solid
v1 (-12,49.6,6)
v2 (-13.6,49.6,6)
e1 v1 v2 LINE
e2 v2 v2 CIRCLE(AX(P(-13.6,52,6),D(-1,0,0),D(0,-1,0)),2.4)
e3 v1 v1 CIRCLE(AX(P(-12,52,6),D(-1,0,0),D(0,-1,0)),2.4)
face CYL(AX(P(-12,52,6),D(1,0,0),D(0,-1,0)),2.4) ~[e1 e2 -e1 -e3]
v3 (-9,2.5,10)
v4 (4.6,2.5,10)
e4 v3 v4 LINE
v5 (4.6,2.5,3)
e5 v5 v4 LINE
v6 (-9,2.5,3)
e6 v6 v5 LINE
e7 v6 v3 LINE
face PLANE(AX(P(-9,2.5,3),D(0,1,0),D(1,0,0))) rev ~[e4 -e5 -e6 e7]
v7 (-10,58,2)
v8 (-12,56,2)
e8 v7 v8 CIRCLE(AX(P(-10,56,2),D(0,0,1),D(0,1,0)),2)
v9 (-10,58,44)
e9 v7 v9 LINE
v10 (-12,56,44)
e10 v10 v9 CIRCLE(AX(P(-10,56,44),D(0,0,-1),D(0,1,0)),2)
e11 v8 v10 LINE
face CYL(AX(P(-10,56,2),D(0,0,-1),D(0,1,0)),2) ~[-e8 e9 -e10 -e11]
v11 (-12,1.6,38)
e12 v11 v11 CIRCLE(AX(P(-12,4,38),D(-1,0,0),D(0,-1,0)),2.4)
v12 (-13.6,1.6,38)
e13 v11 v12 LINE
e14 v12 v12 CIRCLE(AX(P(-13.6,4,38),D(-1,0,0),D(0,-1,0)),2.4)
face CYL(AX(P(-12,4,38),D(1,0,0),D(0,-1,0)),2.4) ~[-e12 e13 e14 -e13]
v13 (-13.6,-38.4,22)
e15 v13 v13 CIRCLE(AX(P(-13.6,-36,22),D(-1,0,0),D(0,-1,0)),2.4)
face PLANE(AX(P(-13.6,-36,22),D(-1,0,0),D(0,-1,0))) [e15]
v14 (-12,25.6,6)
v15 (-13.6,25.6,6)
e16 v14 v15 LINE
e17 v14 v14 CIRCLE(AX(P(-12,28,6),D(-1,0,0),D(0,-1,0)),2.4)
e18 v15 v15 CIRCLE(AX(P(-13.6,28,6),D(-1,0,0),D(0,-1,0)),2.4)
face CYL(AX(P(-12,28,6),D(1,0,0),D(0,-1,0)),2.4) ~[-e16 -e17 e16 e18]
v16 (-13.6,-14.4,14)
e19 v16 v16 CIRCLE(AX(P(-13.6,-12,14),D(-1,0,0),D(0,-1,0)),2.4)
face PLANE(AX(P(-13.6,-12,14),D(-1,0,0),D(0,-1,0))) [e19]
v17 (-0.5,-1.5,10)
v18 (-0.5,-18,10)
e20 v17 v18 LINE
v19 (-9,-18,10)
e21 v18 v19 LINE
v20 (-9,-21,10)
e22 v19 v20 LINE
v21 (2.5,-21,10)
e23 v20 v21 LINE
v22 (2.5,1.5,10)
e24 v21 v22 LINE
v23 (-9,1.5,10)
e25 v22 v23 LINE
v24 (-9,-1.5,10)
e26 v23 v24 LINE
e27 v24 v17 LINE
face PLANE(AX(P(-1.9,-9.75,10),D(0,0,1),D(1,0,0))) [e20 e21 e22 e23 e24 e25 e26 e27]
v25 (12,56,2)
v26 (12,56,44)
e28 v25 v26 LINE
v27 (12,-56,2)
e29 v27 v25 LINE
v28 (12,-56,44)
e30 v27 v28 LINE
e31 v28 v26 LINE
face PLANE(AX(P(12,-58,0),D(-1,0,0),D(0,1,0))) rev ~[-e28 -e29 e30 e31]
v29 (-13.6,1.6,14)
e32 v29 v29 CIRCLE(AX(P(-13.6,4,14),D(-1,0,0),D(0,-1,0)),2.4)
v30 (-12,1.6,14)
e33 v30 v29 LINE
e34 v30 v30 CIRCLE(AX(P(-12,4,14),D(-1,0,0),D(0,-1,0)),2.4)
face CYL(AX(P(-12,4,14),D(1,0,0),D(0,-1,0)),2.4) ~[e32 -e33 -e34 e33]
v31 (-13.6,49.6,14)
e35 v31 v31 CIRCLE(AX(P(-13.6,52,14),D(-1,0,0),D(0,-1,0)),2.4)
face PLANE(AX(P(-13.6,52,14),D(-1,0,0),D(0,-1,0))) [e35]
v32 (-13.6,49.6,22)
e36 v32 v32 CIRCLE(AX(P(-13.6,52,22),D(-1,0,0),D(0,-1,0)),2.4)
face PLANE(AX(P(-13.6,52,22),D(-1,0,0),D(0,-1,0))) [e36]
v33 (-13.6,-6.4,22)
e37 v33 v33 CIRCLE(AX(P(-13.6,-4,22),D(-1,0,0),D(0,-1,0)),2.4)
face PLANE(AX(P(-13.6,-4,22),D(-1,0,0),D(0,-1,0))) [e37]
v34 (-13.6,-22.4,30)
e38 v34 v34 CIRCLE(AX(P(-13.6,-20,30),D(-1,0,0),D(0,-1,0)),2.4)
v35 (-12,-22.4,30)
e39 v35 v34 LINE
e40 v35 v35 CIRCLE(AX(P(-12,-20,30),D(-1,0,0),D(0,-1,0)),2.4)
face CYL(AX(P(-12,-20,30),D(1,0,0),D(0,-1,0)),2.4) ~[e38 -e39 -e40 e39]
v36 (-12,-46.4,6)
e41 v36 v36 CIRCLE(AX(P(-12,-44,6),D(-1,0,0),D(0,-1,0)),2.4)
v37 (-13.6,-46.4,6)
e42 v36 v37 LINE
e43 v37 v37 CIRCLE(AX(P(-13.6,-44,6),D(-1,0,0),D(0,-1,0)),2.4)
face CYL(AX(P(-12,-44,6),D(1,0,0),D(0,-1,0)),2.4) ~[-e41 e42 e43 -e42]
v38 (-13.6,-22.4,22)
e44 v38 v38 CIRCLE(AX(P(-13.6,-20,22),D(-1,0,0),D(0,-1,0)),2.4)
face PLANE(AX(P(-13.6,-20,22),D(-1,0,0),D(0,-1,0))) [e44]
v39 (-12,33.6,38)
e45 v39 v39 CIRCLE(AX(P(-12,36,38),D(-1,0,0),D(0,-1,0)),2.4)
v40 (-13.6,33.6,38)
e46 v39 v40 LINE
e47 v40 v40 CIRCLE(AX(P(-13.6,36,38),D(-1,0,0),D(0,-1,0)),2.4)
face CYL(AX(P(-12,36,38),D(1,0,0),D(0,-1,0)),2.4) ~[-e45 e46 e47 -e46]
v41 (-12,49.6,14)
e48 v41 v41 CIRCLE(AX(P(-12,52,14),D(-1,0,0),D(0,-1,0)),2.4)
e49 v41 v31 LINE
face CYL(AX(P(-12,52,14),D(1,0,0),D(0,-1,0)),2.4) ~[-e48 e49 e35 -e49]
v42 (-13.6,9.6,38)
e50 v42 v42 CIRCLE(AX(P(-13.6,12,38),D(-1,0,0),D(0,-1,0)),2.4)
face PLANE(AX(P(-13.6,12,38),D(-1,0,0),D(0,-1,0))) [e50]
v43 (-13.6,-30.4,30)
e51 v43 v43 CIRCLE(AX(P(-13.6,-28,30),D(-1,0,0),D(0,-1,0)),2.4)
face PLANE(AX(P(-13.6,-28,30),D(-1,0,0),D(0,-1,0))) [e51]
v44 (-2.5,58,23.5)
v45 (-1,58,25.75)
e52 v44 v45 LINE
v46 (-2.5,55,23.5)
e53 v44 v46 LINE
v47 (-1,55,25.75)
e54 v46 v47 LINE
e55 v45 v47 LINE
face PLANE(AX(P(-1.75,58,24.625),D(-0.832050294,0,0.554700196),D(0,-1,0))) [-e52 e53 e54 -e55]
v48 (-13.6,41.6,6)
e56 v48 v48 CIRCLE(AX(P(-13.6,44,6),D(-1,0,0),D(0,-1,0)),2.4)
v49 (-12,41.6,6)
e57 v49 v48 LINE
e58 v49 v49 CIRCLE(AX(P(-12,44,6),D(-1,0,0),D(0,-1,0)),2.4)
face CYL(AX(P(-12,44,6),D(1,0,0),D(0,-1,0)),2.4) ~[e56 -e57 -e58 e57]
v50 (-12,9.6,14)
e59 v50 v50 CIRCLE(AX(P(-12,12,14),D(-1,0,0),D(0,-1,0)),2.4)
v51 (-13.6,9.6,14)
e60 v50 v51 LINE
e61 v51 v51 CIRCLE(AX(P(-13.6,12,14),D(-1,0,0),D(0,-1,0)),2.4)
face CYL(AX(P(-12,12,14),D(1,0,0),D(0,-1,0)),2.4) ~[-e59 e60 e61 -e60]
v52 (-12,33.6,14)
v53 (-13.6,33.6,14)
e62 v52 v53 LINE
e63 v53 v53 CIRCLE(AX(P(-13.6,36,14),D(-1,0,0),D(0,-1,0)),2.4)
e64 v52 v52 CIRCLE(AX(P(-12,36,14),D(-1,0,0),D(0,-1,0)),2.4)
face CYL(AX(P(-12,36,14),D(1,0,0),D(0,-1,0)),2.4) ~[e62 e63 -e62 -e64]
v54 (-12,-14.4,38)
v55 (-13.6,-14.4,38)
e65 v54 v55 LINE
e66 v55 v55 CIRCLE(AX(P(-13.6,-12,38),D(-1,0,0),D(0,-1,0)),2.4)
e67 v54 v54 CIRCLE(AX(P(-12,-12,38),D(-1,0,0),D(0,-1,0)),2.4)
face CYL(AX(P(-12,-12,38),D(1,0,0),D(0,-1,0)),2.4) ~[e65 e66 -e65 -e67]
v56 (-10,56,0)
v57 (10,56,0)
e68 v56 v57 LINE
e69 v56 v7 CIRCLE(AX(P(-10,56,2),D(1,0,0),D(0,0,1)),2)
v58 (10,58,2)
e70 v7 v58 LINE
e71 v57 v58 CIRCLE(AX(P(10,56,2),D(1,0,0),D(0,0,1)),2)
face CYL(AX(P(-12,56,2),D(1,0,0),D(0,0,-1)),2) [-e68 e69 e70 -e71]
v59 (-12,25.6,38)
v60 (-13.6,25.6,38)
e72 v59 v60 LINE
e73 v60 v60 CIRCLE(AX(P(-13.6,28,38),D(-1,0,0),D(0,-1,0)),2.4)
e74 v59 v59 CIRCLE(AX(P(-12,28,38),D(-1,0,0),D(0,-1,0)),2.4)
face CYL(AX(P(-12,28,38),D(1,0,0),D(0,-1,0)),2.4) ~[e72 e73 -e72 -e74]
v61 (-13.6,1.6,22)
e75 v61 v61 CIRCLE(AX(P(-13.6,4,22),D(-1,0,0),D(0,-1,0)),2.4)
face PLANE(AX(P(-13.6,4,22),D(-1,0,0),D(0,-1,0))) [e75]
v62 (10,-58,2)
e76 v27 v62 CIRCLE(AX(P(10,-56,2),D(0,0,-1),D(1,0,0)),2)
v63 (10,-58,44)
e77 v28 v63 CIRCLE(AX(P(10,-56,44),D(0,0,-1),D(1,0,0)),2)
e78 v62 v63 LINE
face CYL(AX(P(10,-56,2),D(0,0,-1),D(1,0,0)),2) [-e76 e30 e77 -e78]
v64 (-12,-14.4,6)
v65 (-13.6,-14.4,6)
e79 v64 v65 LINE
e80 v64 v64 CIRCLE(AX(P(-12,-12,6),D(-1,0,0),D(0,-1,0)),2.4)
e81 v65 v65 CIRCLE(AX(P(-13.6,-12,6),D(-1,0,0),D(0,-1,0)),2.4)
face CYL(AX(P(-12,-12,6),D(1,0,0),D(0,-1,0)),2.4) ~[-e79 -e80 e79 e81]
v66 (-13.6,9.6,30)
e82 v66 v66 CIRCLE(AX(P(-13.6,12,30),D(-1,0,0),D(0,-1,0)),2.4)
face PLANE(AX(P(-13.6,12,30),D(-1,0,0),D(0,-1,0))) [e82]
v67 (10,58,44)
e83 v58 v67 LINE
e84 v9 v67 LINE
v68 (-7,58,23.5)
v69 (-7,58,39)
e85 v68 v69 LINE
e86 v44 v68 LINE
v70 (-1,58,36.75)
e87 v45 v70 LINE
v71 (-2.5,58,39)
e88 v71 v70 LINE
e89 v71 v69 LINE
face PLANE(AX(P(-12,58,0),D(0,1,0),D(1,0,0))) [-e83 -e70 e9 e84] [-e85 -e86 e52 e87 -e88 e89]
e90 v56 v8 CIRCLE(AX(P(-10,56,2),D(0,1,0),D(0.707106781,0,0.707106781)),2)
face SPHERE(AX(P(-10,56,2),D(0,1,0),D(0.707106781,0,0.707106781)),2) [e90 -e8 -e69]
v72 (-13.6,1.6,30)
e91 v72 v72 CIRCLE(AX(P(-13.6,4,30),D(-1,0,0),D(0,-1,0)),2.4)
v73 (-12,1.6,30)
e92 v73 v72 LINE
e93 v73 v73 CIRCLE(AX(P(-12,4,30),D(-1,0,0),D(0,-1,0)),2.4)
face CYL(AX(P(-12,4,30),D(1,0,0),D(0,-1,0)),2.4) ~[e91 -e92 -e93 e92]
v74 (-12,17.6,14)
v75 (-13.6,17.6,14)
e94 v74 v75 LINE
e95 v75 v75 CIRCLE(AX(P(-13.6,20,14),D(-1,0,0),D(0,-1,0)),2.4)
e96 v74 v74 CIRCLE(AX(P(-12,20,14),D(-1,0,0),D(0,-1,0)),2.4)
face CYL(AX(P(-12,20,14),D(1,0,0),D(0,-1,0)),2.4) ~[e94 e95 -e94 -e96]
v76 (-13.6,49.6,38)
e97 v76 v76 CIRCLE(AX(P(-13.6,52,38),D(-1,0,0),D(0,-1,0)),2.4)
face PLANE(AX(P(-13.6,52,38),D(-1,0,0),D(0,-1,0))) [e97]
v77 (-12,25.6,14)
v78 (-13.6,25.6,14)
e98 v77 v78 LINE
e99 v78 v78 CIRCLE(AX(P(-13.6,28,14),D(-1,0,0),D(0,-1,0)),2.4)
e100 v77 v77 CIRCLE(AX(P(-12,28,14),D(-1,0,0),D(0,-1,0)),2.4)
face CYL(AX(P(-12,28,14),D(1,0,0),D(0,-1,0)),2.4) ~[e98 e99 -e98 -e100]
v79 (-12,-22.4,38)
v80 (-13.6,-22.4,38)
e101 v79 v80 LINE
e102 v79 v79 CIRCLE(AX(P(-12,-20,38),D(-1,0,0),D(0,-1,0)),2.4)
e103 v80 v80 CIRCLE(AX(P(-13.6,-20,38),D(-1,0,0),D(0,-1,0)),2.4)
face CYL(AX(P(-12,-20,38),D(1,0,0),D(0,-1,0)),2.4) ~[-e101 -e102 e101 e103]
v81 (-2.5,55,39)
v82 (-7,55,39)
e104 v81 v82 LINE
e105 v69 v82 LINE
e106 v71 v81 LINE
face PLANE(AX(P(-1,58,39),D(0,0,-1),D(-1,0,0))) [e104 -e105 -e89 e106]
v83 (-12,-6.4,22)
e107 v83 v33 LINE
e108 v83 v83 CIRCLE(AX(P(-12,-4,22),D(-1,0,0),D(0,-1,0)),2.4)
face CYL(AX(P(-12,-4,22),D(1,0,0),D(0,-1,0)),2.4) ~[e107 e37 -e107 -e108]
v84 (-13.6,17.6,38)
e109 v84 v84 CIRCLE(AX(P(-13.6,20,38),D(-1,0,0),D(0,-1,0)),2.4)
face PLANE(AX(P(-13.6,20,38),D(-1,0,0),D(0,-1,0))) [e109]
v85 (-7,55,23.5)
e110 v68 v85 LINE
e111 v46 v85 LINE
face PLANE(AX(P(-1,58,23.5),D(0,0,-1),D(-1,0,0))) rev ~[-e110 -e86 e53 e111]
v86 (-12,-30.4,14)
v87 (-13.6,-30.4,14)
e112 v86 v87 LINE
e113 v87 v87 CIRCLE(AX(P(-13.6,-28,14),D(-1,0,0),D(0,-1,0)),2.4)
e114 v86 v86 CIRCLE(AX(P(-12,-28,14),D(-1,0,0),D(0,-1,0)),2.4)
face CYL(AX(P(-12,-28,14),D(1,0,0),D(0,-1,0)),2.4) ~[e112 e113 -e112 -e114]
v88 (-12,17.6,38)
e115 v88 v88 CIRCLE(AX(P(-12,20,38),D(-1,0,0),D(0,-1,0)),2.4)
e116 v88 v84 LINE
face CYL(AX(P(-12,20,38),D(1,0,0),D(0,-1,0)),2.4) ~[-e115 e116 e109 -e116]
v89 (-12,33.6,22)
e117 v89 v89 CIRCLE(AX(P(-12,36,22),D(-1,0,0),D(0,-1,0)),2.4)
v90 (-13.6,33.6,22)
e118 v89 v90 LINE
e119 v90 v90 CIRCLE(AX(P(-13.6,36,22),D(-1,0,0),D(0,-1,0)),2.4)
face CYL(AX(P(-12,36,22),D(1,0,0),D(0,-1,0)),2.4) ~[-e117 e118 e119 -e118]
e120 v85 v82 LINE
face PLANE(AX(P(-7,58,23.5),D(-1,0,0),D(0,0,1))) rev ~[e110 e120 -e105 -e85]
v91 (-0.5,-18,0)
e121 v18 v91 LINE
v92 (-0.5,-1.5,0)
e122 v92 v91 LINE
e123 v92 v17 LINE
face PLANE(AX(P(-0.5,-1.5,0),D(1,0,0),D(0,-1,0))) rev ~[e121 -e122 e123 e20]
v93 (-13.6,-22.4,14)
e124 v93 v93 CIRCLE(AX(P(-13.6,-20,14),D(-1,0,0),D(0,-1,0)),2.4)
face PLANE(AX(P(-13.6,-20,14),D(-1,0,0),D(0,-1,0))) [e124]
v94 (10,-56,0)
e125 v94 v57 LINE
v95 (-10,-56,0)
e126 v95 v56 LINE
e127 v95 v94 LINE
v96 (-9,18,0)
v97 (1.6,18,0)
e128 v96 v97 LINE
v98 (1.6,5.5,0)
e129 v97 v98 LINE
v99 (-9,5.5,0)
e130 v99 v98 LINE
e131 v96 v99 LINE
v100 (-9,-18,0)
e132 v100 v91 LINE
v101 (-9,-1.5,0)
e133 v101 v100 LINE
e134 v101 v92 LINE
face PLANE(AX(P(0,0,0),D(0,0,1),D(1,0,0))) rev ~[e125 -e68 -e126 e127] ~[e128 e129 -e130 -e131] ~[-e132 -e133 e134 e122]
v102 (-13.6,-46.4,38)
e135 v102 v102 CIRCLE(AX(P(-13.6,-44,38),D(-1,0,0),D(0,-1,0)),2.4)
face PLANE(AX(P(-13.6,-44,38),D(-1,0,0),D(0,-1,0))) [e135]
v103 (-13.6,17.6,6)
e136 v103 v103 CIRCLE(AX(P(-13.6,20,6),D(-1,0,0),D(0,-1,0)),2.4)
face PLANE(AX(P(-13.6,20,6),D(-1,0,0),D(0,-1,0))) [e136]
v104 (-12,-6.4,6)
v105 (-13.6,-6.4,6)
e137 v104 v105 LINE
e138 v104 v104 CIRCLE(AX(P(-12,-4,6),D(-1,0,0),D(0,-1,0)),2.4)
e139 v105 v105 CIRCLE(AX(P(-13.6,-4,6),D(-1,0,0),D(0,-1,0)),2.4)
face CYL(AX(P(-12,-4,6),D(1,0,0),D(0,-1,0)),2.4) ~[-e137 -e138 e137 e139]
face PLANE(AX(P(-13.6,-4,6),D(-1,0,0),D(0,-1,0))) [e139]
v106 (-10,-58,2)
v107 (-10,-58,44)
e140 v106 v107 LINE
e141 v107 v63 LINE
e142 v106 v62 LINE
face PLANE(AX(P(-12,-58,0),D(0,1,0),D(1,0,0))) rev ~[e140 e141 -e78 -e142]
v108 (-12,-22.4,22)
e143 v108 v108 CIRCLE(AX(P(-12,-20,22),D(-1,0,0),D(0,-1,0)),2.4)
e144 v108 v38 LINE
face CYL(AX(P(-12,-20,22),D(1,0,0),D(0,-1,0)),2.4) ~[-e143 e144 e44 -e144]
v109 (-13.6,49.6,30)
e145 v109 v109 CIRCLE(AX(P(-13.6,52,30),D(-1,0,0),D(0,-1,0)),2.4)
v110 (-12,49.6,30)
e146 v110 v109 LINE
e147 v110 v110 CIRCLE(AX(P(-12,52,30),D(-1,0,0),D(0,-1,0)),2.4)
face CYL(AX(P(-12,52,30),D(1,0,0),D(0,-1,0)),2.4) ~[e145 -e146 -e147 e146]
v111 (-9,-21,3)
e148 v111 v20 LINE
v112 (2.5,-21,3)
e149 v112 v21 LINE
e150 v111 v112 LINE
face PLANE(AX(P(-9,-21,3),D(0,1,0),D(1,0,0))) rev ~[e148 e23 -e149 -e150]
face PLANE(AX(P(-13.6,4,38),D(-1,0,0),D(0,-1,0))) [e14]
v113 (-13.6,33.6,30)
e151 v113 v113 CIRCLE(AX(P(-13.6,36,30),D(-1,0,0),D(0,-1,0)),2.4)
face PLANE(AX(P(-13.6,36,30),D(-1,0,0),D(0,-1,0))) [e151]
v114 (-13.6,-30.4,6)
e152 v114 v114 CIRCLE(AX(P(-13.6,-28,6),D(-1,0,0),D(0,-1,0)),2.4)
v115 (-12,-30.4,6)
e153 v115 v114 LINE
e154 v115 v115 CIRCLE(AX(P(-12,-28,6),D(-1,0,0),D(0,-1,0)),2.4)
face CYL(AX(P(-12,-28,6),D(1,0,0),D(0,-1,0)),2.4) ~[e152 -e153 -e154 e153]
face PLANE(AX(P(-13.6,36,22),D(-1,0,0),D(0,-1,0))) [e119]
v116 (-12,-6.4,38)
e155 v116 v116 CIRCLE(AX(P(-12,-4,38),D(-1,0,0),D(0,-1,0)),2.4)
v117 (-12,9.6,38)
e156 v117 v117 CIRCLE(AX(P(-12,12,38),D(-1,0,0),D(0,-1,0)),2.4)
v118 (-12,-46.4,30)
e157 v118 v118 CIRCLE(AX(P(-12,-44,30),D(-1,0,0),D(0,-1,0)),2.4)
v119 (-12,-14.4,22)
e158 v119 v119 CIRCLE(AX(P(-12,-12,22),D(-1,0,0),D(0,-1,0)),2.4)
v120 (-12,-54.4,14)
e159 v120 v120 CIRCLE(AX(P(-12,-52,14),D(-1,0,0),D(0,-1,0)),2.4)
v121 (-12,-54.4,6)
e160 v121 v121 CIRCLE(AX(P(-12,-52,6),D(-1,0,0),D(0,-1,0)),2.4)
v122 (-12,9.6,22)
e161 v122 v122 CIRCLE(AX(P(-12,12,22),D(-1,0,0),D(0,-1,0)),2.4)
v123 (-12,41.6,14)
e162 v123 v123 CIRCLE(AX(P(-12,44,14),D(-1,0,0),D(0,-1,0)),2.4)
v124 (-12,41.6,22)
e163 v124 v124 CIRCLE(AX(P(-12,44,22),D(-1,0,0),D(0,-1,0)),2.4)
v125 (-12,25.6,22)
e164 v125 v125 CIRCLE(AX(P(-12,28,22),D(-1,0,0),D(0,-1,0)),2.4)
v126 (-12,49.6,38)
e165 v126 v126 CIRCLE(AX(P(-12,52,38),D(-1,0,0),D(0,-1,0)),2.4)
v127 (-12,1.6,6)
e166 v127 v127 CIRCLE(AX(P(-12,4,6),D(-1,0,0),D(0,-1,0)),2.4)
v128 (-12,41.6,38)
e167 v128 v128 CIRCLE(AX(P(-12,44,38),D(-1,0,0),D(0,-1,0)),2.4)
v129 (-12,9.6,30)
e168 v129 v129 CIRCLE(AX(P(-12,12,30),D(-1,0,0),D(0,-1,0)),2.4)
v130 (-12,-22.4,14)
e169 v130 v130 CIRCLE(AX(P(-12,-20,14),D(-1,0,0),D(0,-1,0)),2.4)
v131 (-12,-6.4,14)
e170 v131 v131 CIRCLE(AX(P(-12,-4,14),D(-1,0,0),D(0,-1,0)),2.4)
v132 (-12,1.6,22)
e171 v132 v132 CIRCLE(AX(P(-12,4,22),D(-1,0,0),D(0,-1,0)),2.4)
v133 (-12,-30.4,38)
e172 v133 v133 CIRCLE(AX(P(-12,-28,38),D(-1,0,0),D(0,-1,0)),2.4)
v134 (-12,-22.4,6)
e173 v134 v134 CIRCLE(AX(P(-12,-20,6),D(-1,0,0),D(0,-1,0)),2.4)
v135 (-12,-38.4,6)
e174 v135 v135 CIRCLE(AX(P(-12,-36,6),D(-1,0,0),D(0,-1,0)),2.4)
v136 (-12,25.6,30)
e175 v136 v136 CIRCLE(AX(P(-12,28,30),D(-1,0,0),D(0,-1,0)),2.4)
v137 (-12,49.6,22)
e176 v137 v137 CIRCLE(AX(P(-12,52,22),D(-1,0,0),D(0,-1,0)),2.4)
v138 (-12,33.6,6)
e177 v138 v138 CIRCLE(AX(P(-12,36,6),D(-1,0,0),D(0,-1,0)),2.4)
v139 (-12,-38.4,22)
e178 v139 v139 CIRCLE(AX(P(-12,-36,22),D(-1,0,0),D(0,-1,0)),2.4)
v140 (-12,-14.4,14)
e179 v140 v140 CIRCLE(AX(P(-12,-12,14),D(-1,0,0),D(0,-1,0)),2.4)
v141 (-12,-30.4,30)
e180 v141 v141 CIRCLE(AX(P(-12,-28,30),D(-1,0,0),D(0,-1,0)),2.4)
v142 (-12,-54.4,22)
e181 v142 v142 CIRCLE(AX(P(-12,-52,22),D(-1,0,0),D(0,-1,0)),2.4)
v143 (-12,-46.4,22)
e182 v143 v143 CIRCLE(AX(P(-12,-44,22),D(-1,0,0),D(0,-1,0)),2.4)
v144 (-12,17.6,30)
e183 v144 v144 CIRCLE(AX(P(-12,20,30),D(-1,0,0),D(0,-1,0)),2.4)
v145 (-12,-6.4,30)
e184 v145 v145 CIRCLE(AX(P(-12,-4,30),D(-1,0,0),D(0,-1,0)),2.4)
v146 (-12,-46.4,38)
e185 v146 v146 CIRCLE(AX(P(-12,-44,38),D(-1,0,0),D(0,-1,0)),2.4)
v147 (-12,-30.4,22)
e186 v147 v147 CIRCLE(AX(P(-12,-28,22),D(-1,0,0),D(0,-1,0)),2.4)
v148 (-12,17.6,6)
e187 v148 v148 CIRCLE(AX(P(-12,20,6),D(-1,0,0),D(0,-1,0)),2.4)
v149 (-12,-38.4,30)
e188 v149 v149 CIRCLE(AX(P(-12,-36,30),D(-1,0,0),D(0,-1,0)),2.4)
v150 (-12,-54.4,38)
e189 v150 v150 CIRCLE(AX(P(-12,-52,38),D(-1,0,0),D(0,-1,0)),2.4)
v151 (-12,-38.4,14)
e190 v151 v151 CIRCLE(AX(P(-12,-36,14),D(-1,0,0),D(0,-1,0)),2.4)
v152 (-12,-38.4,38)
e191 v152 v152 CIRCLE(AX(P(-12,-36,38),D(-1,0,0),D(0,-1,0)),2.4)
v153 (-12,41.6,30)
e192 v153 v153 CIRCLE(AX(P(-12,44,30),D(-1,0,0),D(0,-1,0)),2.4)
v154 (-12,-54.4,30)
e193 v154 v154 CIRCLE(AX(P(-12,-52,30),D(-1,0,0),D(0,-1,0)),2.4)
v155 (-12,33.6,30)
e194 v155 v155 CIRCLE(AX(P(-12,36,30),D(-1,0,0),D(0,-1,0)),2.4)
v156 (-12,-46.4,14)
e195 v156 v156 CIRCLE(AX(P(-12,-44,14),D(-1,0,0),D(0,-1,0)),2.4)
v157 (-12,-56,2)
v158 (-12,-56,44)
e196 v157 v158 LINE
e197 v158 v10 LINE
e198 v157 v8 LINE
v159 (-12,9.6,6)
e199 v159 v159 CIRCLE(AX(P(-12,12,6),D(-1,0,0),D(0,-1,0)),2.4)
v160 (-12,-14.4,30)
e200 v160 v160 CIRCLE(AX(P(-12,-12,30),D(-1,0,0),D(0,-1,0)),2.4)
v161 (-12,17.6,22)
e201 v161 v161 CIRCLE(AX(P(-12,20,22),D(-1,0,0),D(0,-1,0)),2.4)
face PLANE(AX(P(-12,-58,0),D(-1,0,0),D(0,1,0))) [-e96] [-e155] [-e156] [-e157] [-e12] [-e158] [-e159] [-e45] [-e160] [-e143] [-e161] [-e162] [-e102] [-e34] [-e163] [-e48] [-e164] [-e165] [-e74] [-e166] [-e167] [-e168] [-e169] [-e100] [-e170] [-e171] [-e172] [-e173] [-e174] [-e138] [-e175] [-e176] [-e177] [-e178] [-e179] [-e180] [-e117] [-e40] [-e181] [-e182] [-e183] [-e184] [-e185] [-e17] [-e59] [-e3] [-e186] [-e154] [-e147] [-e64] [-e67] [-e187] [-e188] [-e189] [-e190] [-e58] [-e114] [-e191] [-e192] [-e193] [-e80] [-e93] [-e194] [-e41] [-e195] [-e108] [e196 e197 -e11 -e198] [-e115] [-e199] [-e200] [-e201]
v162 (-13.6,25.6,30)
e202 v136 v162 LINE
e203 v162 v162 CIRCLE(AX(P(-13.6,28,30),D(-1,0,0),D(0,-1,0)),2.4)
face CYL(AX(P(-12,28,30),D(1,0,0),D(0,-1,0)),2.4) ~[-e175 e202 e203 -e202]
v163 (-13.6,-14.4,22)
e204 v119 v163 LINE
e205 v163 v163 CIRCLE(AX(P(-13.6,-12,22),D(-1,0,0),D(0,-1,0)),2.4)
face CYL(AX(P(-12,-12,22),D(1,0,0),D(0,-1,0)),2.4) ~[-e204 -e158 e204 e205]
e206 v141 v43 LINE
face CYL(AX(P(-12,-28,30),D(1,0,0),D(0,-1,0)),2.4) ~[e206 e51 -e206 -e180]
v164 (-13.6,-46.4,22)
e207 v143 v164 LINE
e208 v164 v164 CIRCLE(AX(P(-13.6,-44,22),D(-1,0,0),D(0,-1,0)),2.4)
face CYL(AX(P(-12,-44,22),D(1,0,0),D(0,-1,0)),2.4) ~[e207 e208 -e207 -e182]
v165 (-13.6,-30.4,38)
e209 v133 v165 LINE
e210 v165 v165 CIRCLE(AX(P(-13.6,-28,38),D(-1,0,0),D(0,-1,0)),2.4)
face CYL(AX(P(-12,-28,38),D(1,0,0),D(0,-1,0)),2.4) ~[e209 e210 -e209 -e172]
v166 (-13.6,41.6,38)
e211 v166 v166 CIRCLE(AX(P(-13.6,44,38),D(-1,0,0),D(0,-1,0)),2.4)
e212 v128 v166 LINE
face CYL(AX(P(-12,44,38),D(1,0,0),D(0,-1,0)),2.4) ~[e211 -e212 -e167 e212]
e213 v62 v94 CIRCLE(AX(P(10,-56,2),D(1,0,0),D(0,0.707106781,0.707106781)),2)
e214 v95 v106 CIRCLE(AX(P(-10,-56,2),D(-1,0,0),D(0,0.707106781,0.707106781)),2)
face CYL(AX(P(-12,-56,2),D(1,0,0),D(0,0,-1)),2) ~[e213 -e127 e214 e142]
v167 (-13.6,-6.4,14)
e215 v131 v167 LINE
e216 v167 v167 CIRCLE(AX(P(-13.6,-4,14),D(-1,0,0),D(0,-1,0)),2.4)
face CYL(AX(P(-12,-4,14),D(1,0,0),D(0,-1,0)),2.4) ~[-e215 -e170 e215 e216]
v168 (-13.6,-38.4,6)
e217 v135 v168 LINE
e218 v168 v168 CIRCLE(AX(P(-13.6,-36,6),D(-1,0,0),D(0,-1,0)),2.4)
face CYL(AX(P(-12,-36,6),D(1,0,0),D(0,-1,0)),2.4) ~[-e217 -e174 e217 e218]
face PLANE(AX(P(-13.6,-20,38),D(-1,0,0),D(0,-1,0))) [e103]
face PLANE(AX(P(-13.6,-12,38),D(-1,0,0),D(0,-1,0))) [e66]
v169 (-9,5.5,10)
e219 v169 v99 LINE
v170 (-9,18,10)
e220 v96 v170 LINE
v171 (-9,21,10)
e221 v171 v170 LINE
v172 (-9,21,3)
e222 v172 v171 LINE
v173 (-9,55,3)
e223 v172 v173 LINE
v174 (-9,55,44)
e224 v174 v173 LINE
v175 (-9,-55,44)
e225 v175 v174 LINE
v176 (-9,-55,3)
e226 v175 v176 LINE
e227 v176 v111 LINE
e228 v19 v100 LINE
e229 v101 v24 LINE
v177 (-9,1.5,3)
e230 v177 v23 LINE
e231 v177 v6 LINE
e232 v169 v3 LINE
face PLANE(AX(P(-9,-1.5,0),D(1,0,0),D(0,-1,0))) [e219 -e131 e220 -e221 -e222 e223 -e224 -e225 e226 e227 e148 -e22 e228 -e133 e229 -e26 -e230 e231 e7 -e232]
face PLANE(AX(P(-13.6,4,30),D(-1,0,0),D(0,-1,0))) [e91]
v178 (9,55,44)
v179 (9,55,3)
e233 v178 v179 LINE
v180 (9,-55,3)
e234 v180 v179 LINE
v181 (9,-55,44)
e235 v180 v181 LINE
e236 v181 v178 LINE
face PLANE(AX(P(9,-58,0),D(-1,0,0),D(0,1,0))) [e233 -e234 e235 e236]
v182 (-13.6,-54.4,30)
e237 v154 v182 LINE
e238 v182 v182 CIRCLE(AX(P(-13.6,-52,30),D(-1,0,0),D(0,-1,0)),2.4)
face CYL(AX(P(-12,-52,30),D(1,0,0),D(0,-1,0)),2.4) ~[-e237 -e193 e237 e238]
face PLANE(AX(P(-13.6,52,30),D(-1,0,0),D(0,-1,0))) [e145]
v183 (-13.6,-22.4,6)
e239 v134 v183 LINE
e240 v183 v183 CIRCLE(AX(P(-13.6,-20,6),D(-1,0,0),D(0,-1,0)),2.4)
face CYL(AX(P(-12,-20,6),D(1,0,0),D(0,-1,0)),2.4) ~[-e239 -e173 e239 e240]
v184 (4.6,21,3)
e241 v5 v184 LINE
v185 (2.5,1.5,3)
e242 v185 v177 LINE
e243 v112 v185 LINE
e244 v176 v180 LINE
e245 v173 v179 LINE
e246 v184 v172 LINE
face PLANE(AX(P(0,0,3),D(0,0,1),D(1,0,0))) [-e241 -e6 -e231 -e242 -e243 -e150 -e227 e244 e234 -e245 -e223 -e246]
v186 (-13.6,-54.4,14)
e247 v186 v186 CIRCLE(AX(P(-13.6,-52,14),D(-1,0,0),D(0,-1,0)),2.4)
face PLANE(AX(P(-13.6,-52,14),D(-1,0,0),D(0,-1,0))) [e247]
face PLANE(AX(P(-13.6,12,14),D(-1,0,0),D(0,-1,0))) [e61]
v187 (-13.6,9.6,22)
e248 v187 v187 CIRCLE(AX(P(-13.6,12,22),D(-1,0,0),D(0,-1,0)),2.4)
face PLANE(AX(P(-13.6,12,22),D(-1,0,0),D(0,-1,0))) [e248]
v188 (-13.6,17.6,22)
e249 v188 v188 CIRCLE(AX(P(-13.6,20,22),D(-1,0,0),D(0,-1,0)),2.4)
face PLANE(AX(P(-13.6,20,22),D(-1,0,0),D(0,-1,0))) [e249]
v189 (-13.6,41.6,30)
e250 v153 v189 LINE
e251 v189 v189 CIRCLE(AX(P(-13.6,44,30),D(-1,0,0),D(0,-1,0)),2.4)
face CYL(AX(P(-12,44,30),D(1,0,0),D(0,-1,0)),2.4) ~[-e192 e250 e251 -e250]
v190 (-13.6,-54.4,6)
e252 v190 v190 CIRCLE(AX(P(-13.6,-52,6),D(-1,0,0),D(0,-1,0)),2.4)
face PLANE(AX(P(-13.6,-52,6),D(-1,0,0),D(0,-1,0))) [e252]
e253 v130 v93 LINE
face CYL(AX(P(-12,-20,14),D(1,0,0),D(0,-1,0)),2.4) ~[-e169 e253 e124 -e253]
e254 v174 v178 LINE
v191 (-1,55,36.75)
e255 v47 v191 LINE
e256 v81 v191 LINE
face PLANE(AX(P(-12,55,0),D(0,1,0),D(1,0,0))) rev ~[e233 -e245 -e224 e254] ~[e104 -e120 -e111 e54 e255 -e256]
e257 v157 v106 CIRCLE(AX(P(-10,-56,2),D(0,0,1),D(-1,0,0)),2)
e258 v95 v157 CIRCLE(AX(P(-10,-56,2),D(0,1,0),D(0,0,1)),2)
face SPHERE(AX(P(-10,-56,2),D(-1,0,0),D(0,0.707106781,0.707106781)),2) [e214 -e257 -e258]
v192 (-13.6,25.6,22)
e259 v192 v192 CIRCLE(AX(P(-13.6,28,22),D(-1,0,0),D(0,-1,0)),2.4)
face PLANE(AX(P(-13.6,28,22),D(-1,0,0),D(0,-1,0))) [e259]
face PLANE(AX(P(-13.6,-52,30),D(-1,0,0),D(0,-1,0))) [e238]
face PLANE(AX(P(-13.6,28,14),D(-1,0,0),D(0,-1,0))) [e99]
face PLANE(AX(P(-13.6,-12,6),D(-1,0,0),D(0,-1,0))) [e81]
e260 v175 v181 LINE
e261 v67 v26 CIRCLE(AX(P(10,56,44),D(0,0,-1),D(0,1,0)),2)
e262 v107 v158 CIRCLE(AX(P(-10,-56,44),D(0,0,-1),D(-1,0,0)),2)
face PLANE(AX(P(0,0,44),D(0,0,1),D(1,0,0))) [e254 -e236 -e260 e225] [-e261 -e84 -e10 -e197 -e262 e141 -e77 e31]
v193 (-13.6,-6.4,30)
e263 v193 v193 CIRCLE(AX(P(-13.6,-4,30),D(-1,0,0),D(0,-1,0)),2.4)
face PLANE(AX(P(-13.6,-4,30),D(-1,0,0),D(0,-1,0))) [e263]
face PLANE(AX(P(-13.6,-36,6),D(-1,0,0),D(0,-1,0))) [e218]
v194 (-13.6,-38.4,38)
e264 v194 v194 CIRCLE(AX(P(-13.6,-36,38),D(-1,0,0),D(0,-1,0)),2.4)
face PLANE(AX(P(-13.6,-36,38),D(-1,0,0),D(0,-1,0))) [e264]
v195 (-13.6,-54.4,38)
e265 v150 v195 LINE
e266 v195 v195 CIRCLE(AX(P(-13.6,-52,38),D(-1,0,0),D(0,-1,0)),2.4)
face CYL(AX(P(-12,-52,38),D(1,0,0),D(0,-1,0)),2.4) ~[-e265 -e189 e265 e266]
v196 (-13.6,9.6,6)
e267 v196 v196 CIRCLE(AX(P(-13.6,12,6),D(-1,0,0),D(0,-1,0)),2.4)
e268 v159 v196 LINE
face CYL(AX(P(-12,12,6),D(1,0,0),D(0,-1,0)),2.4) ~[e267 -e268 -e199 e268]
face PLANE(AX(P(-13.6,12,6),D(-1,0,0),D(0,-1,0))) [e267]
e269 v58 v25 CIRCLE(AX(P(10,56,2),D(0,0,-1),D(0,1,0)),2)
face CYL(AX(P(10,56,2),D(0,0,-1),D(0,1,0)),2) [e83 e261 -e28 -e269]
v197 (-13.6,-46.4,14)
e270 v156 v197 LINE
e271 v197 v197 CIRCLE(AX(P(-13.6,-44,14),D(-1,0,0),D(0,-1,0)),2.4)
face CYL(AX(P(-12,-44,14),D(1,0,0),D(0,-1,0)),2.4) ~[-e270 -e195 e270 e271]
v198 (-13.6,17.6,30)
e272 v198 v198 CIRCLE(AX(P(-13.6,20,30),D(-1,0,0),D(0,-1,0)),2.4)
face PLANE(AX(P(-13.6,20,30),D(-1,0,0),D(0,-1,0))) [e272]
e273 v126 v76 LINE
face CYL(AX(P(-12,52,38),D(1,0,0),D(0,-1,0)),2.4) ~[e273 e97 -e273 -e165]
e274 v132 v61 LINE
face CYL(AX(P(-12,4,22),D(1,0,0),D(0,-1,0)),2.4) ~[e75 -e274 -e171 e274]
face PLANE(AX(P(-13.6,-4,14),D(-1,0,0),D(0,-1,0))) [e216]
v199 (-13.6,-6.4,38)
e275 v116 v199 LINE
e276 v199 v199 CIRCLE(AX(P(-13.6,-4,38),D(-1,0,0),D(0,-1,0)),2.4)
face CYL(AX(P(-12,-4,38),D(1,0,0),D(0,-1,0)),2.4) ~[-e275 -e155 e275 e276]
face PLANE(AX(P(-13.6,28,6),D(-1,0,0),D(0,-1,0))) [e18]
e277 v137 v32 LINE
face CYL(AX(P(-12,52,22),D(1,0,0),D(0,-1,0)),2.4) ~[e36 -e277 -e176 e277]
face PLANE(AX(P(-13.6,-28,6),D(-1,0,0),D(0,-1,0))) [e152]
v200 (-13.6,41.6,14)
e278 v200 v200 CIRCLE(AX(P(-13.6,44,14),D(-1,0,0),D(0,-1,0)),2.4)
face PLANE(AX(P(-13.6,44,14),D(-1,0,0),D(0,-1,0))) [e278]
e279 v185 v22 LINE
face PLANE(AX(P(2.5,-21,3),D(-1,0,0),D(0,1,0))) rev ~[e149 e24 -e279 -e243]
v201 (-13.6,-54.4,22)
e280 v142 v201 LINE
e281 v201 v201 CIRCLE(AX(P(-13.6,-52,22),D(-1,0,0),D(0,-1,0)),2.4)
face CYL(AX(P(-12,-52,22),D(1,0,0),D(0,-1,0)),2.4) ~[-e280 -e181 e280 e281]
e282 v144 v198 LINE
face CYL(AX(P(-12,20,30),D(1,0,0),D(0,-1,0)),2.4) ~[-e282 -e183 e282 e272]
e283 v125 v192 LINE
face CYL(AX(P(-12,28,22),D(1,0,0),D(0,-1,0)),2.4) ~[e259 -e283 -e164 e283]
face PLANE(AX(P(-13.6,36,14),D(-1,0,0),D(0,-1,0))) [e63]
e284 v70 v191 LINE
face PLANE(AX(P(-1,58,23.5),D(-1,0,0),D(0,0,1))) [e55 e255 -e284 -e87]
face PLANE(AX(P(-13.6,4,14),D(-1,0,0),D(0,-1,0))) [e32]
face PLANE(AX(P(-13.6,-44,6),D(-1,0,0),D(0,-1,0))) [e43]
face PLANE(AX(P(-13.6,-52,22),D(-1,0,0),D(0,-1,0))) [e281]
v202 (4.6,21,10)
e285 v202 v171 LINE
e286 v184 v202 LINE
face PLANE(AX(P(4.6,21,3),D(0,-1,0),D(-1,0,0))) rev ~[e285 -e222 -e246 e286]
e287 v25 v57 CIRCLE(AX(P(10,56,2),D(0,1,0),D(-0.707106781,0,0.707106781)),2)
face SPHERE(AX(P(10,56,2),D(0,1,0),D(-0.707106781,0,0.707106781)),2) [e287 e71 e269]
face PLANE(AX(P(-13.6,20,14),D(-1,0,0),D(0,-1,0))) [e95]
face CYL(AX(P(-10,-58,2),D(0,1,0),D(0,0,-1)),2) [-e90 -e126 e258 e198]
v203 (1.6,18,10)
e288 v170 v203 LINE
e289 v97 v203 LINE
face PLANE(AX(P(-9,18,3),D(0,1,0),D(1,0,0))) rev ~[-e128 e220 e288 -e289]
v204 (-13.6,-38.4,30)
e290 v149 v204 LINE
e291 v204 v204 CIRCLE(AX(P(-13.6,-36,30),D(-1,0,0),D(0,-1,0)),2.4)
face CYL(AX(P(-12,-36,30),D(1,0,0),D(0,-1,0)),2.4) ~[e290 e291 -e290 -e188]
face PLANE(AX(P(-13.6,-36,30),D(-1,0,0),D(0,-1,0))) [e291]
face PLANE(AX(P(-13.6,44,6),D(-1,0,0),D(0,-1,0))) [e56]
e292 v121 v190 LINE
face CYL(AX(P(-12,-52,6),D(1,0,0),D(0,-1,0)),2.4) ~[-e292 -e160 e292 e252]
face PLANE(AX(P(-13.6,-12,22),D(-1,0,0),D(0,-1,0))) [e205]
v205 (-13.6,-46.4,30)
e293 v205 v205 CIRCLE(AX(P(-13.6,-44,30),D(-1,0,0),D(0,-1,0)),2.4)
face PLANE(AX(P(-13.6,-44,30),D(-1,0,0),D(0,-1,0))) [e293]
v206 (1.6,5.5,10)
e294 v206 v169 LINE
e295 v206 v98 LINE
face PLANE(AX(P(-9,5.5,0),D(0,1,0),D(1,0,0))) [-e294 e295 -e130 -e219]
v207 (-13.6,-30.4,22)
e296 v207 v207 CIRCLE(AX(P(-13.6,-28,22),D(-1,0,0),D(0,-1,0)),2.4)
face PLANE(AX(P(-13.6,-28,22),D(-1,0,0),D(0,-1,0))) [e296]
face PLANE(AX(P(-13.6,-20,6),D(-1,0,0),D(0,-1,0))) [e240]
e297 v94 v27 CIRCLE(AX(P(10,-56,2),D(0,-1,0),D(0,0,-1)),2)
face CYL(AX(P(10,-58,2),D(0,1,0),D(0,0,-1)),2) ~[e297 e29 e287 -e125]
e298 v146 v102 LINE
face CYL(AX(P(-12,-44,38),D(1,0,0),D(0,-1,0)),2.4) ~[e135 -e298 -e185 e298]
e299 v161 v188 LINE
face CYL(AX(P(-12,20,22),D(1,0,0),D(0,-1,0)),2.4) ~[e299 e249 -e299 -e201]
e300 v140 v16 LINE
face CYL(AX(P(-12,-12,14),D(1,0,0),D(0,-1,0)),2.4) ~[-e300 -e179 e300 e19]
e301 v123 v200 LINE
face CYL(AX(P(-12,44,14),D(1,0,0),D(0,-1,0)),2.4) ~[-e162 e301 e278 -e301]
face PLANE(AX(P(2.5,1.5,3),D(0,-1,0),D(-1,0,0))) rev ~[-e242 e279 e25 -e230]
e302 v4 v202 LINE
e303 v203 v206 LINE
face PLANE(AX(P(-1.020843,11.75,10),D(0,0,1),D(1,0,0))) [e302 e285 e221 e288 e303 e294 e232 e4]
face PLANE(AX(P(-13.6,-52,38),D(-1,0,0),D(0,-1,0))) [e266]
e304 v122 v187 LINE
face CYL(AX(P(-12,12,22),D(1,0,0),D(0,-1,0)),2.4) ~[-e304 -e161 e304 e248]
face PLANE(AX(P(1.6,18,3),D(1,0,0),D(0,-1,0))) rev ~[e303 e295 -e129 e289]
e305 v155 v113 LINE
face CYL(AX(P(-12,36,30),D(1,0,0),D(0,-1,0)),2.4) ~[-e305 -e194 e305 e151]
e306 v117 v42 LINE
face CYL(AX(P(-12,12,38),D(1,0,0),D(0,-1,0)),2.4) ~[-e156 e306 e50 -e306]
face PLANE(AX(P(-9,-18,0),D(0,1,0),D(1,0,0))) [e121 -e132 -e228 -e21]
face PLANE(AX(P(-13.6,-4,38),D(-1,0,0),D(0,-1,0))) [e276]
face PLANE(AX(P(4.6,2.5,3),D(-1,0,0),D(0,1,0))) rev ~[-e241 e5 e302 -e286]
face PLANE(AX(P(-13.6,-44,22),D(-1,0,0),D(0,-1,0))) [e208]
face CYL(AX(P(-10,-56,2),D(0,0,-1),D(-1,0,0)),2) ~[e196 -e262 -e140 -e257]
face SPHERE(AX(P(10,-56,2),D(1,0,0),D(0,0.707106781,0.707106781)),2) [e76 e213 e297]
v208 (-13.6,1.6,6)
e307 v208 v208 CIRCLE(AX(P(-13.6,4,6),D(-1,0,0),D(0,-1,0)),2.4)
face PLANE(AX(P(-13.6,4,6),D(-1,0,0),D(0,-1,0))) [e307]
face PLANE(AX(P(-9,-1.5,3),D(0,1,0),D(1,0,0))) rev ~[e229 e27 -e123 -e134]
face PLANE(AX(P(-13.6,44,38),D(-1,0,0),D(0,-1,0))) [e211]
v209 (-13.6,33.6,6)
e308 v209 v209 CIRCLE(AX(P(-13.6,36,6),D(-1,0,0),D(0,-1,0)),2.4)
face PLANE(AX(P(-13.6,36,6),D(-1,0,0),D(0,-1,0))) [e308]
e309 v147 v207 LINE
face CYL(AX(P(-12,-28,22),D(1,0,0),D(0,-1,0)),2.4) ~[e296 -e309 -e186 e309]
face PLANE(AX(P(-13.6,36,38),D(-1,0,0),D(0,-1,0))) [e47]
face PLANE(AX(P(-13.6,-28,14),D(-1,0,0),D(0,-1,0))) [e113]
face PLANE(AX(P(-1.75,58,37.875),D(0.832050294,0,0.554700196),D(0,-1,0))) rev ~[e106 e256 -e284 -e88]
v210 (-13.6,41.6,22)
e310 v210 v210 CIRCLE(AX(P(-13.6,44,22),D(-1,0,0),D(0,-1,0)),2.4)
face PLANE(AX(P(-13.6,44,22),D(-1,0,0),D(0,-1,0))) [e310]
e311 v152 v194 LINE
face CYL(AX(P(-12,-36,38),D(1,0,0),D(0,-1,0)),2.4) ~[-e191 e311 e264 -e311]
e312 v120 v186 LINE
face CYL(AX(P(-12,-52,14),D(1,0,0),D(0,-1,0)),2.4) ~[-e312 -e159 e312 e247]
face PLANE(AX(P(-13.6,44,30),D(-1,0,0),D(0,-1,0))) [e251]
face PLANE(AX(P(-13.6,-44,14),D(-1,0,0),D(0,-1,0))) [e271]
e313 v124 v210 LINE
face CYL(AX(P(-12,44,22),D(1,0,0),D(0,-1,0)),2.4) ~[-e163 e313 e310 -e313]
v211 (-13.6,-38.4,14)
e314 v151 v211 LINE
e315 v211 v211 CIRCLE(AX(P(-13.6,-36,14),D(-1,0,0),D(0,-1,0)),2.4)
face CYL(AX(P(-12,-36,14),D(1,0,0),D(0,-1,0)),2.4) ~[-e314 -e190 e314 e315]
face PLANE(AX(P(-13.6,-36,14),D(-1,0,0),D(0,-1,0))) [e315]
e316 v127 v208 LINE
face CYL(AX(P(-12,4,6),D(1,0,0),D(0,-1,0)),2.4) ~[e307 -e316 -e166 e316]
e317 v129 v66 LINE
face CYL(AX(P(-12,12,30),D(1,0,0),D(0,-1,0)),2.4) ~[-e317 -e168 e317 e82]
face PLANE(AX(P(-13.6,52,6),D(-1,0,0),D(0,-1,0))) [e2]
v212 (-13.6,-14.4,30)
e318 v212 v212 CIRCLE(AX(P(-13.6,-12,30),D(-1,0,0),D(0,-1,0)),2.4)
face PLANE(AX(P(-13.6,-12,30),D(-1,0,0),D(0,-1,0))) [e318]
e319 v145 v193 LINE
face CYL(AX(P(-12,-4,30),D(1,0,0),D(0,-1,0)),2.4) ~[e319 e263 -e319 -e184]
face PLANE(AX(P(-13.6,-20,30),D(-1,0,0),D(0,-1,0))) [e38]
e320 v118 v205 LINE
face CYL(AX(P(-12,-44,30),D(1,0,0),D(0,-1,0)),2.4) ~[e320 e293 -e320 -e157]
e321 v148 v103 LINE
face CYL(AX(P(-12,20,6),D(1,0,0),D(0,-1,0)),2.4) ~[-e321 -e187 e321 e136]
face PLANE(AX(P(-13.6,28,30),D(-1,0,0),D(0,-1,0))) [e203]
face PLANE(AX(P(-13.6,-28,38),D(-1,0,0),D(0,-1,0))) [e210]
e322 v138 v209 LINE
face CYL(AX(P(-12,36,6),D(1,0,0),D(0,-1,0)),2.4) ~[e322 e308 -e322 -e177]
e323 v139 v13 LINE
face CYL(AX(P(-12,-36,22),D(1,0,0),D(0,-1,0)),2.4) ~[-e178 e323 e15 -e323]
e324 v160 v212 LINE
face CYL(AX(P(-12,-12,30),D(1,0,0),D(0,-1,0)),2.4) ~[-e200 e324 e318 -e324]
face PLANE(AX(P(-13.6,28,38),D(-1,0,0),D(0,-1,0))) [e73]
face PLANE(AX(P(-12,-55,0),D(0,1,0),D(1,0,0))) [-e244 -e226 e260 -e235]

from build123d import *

# Parameters (mm, degrees)
F0_W          = 24
F0_H          = 116
F1_DEPTH      = 44
F2_T          = -3
F3_W          = 8.5
F3_H          = 16.5
F3_W_2        = 10.6
F3_H_2        = 12.5
F4_DEPTH      = 25
F5_W          = 6
F5_H          = 15.5
F6_DEPTH      = 25
F7_SIZE2      = 2.25
F7_SIZE       = 1.5
F9_DEPTH      = 7
F10_R         = 2.4
F11_DEPTH     = 1.6
F12_R         = 2
F13_T1_DEPTH  = 47
F13_S5_W      = 2
F13_S5_H      = 2
F13_T6_DEPTH  = 2
F13_S11_W     = 2
F13_S11_H     = 2
F13_T12_DEPTH = 2
F13_S17_W     = 2
F13_S17_H     = 2
F13_T18_DEPTH = 2
F13_S23_W     = 2
F13_S23_H     = 2
F13_T24_DEPTH = 2


# Not quite as in the source:
# - a fillet or chamfer that OpenCascade refuses, or shapes differently, is made with other operations: its cross-section is extruded or revolved along the edge and cut away or added


with BuildPart() as f1:
    # F0 (on Top) → F1 (new body)
    with BuildSketch(Plane.XY):
        Rectangle(F0_W, F0_H)
    extrude(amount=F1_DEPTH)

    # F2
    f2_openings = [f1.faces().sort_by_distance(p)[0] for p in [
        (0, 0, 44),
    ]]
    offset(amount=F2_T, openings=f2_openings)

    # F3 (on face) → F4 (cut)
    with BuildSketch(Plane(origin=(0, 0, 0), x_dir=(1, 0, 0), z_dir=(0, 0, -1))):
        with Locations((-4.75, 9.75)):
            Rectangle(F3_W, F3_H)
        with Locations((-3.7, -11.75)):
            Rectangle(F3_W_2, F3_H_2)
    extrude(amount=-F4_DEPTH, mode=Mode.SUBTRACT)

    # F5 (on face) → F6 (cut)
    with BuildSketch(Plane(origin=(0, 58, 0), x_dir=(-1, 0, 0), z_dir=(0, 1, 0))):
        with Locations((4, 31.25)):
            Rectangle(F5_W, F5_H)
    extrude(amount=-F6_DEPTH, mode=Mode.SUBTRACT)

    # F7
    f7_edges = [f1.edges().sort_by_distance(p)[0] for p in [
        (-1, 56.5, 23.5),
        (-1, 56.5, 39),
    ]]
    chamfer(f7_edges, length=F7_SIZE, length2=F7_SIZE2)

    # F8 (on face) → F9 (join)
    with BuildSketch(Plane.XY.offset(3)):
        Polygon((4.6, 21), (-9, 21), (-9, 18), (1.6, 18), (1.6, 5.5), (-9, 5.5), (-9, 2.5), (4.6, 2.5), align=None)
        Polygon((-9, -18), (-9, -21), (2.5, -21), (2.5, 1.5), (-9, 1.5), (-9, -1.5), (-0.5, -1.5), (-0.5, -18), align=None)
    extrude(amount=F9_DEPTH)

    # F10 (on face) → F11 (join)
    with BuildSketch(Plane(origin=(-12, 0, 0), x_dir=(0, -1, 0), z_dir=(-1, 0, 0))):
        with Locations((-52, 6)):
            Circle(F10_R)
        with Locations((-52, 14)):
            Circle(F10_R)
        with Locations((-52, 22)):
            Circle(F10_R)
        with Locations((-52, 30)):
            Circle(F10_R)
        with Locations((-52, 38)):
            Circle(F10_R)
        with Locations((-44, 6)):
            Circle(F10_R)
        with Locations((-44, 14)):
            Circle(F10_R)
        with Locations((-44, 22)):
            Circle(F10_R)
        with Locations((-44, 30)):
            Circle(F10_R)
        with Locations((-44, 38)):
            Circle(F10_R)
        with Locations((-36, 6)):
            Circle(F10_R)
        with Locations((-36, 14)):
            Circle(F10_R)
        with Locations((-36, 22)):
            Circle(F10_R)
        with Locations((-36, 30)):
            Circle(F10_R)
        with Locations((-36, 38)):
            Circle(F10_R)
        with Locations((-28, 6)):
            Circle(F10_R)
        with Locations((-28, 14)):
            Circle(F10_R)
        with Locations((-28, 22)):
            Circle(F10_R)
        with Locations((-28, 30)):
            Circle(F10_R)
        with Locations((-28, 38)):
            Circle(F10_R)
        with Locations((-20, 6)):
            Circle(F10_R)
        with Locations((-20, 14)):
            Circle(F10_R)
        with Locations((-20, 22)):
            Circle(F10_R)
        with Locations((-20, 30)):
            Circle(F10_R)
        with Locations((-20, 38)):
            Circle(F10_R)
        with Locations((-12, 6)):
            Circle(F10_R)
        with Locations((-12, 14)):
            Circle(F10_R)
        with Locations((-12, 22)):
            Circle(F10_R)
        with Locations((-12, 30)):
            Circle(F10_R)
        with Locations((-12, 38)):
            Circle(F10_R)
        with Locations((-4, 6)):
            Circle(F10_R)
        with Locations((-4, 14)):
            Circle(F10_R)
        with Locations((-4, 22)):
            Circle(F10_R)
        with Locations((-4, 30)):
            Circle(F10_R)
        with Locations((-4, 38)):
            Circle(F10_R)
        with Locations((4, 6)):
            Circle(F10_R)
        with Locations((4, 14)):
            Circle(F10_R)
        with Locations((4, 22)):
            Circle(F10_R)
        with Locations((4, 30)):
            Circle(F10_R)
        with Locations((4, 38)):
            Circle(F10_R)
        with Locations((12, 6)):
            Circle(F10_R)
        with Locations((12, 14)):
            Circle(F10_R)
        with Locations((12, 22)):
            Circle(F10_R)
        with Locations((12, 30)):
            Circle(F10_R)
        with Locations((12, 38)):
            Circle(F10_R)
        with Locations((20, 6)):
            Circle(F10_R)
        with Locations((20, 14)):
            Circle(F10_R)
        with Locations((20, 22)):
            Circle(F10_R)
        with Locations((20, 30)):
            Circle(F10_R)
        with Locations((20, 38)):
            Circle(F10_R)
        with Locations((28, 6)):
            Circle(F10_R)
        with Locations((28, 14)):
            Circle(F10_R)
        with Locations((28, 22)):
            Circle(F10_R)
        with Locations((28, 30)):
            Circle(F10_R)
        with Locations((28, 38)):
            Circle(F10_R)
        with Locations((36, 6)):
            Circle(F10_R)
        with Locations((36, 14)):
            Circle(F10_R)
        with Locations((36, 22)):
            Circle(F10_R)
        with Locations((36, 30)):
            Circle(F10_R)
        with Locations((36, 38)):
            Circle(F10_R)
        with Locations((44, 6)):
            Circle(F10_R)
        with Locations((44, 14)):
            Circle(F10_R)
        with Locations((44, 22)):
            Circle(F10_R)
        with Locations((44, 30)):
            Circle(F10_R)
        with Locations((44, 38)):
            Circle(F10_R)
        with Locations((52, 6)):
            Circle(F10_R)
        with Locations((52, 14)):
            Circle(F10_R)
        with Locations((52, 22)):
            Circle(F10_R)
        with Locations((52, 30)):
            Circle(F10_R)
        with Locations((52, 38)):
            Circle(F10_R)
    extrude(amount=F11_DEPTH)

    # F12
    f12_edges = [f1.edges().sort_by_distance(p)[0] for p in [
        (12, 0, 0),
        (0, -58, 0),
        (-12, 0, 0),
        (0, 58, 0),
    ]]
    fillet(f12_edges, radius=F12_R)

    # F13: fillet of radius 2 on 4 edges, made by hand

    # F13_s2 → F13_t1 (cut)
    with BuildSketch(Plane.XY.offset(2)):
        with BuildLine():
            ThreePointArc((-12, -56), (-11.4142135624, -57.4142135624), (-10, -58))
            Line((-10, -58), (-12, -58))
            Line((-12, -58), (-12, -56))
        make_face()
        with BuildLine():
            ThreePointArc((12, -56), (11.4142135624, -57.4142135624), (10, -58))
            Line((10, -58), (12, -58))
            Line((12, -58), (12, -56))
        make_face()
        with BuildLine():
            ThreePointArc((10, 58), (11.4142135624, 57.4142135624), (12, 56))
            Line((12, 56), (12, 58))
            Line((12, 58), (10, 58))
        make_face()
        with BuildLine():
            ThreePointArc((-10, 58), (-11.4142135624, 57.4142135624), (-12, 56))
            Line((-12, 56), (-12, 58))
            Line((-12, 58), (-10, 58))
        make_face()
    extrude(amount=F13_T1_DEPTH, mode=Mode.SUBTRACT)


with BuildPart() as f13_tool4:
    # F13_s5 → F13_t6 (new body)
    with BuildSketch(Plane.XZ.offset(-56)):
        with Locations((-11, 1)):
            Rectangle(F13_S5_W, F13_S5_H)
    extrude(amount=-F13_T6_DEPTH)

    # F13_s7 → F13_t8 (revolve, cut)
    with BuildSketch(Plane(origin=(-10, 56, 2), x_dir=(0.7071067812, 0, 0.7071067812), z_dir=(-0.7071067812, 0, 0.7071067812))):
        with BuildLine():
            ThreePointArc((0, -2), (2, 0), (0, 2))
            Line((0, 2), (0, -2))
        make_face()
    revolve(axis=Axis((-10, 56, 2), (0, 1, 0)), mode=Mode.SUBTRACT)


with BuildPart() as f1_1:
    add(f1.part)

    # F13_t3: cut F13_tool4
    add(f13_tool4.part, mode=Mode.SUBTRACT)


with BuildPart() as f13_tool10:
    # F13_s11 → F13_t12 (new body)
    with BuildSketch(Plane.XZ.offset(-56)):
        with Locations((11, 1)):
            Rectangle(F13_S11_W, F13_S11_H)
    extrude(amount=-F13_T12_DEPTH)

    # F13_s13 → F13_t14 (revolve, cut)
    with BuildSketch(Plane(origin=(10, 56, 2), x_dir=(-0.7071067812, 0, 0.7071067812), z_dir=(-0.7071067812, 0, -0.7071067812))):
        with BuildLine():
            ThreePointArc((0, -2), (2, 0), (0, 2))
            Line((0, 2), (0, -2))
        make_face()
    revolve(axis=Axis((10, 56, 2), (0, 1, 0)), mode=Mode.SUBTRACT)


with BuildPart() as f1_2:
    add(f1_1.part)

    # F13_t9: cut F13_tool10
    add(f13_tool10.part, mode=Mode.SUBTRACT)


with BuildPart() as f13_tool16:
    # F13_s17 → F13_t18 (new body)
    with BuildSketch(Plane.YZ.offset(10)):
        with Locations((-57, 1)):
            Rectangle(F13_S17_W, F13_S17_H)
    extrude(amount=F13_T18_DEPTH)

    # F13_s19 → F13_t20 (revolve, cut)
    with BuildSketch(Plane(origin=(10, -56, 2), x_dir=(0, 0.7071067812, 0.7071067812), z_dir=(0, 0.7071067812, -0.7071067812))):
        with BuildLine():
            ThreePointArc((0, -2), (2, 0), (0, 2))
            Line((0, 2), (0, -2))
        make_face()
    revolve(axis=Axis((10, -56, 2), (1, 0, 0)), mode=Mode.SUBTRACT)


with BuildPart() as f1_3:
    add(f1_2.part)

    # F13_t15: cut F13_tool16
    add(f13_tool16.part, mode=Mode.SUBTRACT)


with BuildPart() as f13_tool22:
    # F13_s23 → F13_t24 (new body)
    with BuildSketch(Plane.YZ.offset(-10)):
        with Locations((-57, 1)):
            Rectangle(F13_S23_W, F13_S23_H)
    extrude(amount=-F13_T24_DEPTH)

    # F13_s25 → F13_t26 (revolve, cut)
    with BuildSketch(Plane(origin=(-10, -56, 2), x_dir=(0, 0.7071067812, 0.7071067812), z_dir=(0, -0.7071067812, 0.7071067812))):
        with BuildLine():
            ThreePointArc((0, -2), (2, 0), (0, 2))
            Line((0, 2), (0, -2))
        make_face()
    revolve(axis=Axis((-10, -56, 2), (-1, 0, 0)), mode=Mode.SUBTRACT)


with BuildPart() as f1_4:
    add(f1_3.part)

    # F13_t21: cut F13_tool22
    add(f13_tool22.part, mode=Mode.SUBTRACT)


solid = f1_4.part
